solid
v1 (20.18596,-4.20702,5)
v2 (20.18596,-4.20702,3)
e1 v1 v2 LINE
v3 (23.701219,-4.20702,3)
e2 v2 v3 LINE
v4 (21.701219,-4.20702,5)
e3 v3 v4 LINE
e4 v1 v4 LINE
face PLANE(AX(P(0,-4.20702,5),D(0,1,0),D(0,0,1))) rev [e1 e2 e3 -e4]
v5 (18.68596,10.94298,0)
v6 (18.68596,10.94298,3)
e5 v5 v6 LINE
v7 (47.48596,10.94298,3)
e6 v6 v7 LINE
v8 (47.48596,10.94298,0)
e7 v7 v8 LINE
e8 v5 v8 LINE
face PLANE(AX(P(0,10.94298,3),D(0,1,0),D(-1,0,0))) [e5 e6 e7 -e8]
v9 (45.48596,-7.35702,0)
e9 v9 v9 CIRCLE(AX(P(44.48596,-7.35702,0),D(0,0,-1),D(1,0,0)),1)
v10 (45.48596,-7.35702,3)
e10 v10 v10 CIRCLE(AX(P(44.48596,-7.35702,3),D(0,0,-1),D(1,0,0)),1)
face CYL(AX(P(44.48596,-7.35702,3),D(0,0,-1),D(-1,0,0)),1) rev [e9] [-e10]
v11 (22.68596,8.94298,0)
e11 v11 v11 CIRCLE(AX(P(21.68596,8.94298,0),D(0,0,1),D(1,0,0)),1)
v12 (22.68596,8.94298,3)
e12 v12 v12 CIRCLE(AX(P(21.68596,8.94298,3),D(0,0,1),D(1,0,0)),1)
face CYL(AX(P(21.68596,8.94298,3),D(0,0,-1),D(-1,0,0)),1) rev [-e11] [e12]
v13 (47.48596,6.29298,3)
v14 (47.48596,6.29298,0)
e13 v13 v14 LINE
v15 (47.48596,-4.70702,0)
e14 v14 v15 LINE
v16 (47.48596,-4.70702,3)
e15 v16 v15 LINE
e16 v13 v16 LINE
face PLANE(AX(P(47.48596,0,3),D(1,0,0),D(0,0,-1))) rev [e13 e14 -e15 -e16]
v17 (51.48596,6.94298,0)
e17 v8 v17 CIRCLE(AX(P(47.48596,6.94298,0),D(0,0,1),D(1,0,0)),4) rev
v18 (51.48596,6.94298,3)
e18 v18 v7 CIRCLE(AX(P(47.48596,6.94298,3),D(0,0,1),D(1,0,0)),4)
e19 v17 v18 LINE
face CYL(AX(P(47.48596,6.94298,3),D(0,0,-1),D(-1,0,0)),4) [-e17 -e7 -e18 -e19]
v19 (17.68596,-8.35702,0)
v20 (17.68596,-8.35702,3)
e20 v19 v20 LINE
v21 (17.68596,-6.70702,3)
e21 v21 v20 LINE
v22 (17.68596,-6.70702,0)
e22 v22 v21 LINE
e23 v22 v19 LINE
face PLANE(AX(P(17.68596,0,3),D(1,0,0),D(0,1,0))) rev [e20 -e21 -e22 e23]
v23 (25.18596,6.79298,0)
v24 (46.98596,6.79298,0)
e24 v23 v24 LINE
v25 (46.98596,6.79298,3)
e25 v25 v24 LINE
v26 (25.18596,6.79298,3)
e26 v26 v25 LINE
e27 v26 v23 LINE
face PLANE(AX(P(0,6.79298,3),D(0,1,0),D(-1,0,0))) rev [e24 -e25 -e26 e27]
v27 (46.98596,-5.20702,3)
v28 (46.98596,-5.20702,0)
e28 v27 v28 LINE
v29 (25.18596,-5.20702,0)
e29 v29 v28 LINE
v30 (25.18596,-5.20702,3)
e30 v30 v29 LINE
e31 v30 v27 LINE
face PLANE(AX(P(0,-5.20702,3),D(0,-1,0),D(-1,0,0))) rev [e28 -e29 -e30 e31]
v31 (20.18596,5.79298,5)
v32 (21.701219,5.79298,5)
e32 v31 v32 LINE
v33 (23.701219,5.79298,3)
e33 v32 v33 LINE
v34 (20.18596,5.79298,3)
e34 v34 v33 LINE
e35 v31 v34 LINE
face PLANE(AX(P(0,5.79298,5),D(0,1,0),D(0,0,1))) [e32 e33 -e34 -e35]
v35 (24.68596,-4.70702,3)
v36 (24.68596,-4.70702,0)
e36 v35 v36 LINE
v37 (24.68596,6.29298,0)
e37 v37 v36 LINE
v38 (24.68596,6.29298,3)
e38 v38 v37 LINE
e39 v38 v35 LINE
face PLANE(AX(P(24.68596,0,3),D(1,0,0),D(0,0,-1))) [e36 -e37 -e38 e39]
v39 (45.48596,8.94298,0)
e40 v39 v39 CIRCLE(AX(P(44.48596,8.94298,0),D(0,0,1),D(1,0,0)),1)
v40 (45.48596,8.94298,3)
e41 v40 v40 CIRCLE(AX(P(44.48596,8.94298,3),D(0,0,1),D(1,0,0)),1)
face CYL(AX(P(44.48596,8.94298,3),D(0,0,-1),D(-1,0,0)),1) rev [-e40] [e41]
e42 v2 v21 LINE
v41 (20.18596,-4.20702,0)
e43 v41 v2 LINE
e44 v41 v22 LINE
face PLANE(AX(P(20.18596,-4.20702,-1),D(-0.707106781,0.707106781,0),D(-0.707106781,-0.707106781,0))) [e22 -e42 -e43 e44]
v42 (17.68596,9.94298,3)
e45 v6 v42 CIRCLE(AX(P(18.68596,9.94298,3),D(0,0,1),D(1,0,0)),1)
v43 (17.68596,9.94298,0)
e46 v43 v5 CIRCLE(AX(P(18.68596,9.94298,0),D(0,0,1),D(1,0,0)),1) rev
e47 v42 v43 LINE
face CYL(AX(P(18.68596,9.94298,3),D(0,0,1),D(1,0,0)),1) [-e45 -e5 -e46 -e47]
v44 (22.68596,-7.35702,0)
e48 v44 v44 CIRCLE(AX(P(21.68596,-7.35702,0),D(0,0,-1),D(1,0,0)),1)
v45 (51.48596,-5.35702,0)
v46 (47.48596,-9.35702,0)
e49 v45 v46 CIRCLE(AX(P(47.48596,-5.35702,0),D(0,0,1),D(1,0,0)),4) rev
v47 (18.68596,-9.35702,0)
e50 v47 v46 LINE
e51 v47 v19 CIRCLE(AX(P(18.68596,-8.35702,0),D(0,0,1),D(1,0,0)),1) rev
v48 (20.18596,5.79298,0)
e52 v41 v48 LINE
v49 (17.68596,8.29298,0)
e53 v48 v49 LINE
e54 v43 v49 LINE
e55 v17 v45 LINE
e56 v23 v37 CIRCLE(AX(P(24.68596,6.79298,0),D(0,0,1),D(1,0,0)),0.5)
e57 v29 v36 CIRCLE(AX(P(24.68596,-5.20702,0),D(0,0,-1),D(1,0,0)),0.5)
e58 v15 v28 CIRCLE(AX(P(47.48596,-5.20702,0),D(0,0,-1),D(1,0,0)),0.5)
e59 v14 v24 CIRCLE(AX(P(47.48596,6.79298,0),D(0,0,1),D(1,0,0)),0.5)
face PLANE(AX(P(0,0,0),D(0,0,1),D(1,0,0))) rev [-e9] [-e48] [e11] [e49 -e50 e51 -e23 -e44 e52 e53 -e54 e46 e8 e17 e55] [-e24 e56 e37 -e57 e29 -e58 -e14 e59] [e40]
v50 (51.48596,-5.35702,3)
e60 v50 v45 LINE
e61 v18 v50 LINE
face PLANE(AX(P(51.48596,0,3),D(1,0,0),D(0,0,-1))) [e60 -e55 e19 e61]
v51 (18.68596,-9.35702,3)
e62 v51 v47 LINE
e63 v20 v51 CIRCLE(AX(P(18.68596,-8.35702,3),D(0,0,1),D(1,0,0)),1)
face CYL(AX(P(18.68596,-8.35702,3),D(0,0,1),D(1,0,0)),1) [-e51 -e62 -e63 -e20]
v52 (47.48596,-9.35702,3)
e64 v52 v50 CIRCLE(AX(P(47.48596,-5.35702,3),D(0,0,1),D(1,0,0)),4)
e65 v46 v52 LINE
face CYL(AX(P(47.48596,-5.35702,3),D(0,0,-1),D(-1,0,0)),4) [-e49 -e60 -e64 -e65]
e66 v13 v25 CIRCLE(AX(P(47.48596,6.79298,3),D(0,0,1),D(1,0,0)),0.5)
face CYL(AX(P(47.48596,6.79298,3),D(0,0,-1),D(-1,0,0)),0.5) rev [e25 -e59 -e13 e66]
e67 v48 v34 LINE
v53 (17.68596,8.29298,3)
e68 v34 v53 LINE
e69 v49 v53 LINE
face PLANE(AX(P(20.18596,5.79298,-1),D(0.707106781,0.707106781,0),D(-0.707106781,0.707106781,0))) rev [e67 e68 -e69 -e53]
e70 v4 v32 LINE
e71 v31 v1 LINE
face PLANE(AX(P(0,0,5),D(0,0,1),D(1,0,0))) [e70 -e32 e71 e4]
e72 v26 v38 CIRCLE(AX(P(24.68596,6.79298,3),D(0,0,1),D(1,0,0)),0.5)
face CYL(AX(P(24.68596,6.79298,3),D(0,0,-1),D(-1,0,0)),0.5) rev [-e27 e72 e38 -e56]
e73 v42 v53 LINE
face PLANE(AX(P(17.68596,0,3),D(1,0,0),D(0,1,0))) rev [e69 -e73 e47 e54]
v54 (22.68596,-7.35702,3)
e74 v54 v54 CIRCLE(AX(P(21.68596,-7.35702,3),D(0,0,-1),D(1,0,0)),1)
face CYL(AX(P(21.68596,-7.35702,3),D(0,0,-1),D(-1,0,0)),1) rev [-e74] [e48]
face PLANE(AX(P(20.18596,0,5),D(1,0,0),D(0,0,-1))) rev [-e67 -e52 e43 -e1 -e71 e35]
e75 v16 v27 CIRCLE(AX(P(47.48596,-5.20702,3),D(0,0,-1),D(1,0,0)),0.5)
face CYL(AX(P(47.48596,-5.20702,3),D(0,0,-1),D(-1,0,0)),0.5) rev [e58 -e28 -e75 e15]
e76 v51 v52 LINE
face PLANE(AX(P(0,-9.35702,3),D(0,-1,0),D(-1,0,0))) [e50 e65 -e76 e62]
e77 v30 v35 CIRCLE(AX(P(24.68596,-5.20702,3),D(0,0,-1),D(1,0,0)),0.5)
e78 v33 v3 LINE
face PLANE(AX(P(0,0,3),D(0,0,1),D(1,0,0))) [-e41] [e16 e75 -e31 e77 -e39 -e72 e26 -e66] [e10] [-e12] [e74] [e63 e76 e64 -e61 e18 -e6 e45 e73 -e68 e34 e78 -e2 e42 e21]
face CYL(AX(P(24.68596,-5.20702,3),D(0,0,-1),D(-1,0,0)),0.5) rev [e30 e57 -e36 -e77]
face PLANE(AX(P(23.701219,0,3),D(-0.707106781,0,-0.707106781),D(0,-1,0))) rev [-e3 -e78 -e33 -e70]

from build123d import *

# Parameters (mm, degrees)
SKETCH2_R           = 1
BOSS_EXTRUDE1_DEPTH = 3
SKETCH3_W           = 3.515258844
SKETCH3_H           = 10
BOSS_EXTRUDE2_DEPTH = 2
CHAMFER1_SIZE       = 2
FILLET1_R           = 4
FILLET2_R           = 1
CUT_EXTRUDE1_DEPTH  = 4


with BuildPart() as part:
    # Sketch2 → Boss-Extrude1 (new body)
    with BuildSketch(Plane.XY):
        with BuildLine():
            Line((47.48595993, 0.792979965), (51.48595993, 0.792979965))
            Line((51.48595993, 0.792979965), (51.48595993, 10.942979965))
            Line((51.48595993, 10.942979965), (17.68595993, 10.942979965))
            Line((17.68595993, 10.942979965), (17.68595993, 0.792979965))
            Line((17.68595993, 0.792979965), (24.68595993, 0.792979965))
            Line((24.68595993, 0.792979965), (24.68595993, 6.292979965))
            ThreePointArc((24.68595993, 6.292979965), (24.33240654, 7.146533356), (25.18595993, 6.792979965))
            Line((25.18595993, 6.792979965), (46.98595993, 6.792979965))
            ThreePointArc((46.98595993, 6.792979965), (47.839513321, 7.146533356), (47.48595993, 6.292979965))
            Line((47.48595993, 6.292979965), (47.48595993, 0.792979965))
        make_face()
        with Locations((44.48595993, 8.942979965)):
            Circle(SKETCH2_R, mode=Mode.SUBTRACT)
        with Locations((21.68595993, 8.942979965)):
            Circle(SKETCH2_R, mode=Mode.SUBTRACT)
    extrude(amount=BOSS_EXTRUDE1_DEPTH)

    # Mirror1: part across plane


with BuildPart() as part_1:
    add(part.part)
    add(part.part.mirror(Plane(origin=(0, 0.792979965, 3), x_dir=(0, 0, 1), z_dir=(0, -1, 0))))

    # Sketch3 → Boss-Extrude2 (add)
    with BuildSketch(Plane.XY.offset(3)):
        with Locations((21.943589352, 0.792979965)):
            Rectangle(SKETCH3_W, SKETCH3_H)
    extrude(amount=BOSS_EXTRUDE2_DEPTH)

    # Chamfer1
    chamfer1_edges = [part_1.edges().sort_by_distance(p)[0] for p in [
        (23.701218774, 0.792979965, 5),
    ]]
    chamfer(chamfer1_edges, length=CHAMFER1_SIZE - 0.0001)  # a hair under: the kernel refuses the full size

    # Fillet1
    fillet1_edges = [part_1.edges().sort_by_distance(p)[0] for p in [
        (51.48595993, 10.942979965, 1.5),
        (51.48595993, -9.357020035, 1.5),
    ]]
    fillet(fillet1_edges, radius=FILLET1_R)

    # Fillet2
    fillet2_edges = [part_1.edges().sort_by_distance(p)[0] for p in [
        (17.68595993, 10.942979965, 1.5),
        (17.68595993, -9.357020035, 1.5),
    ]]
    fillet(fillet2_edges, radius=FILLET2_R)

    # Sketch4 → Cut-Extrude1 (cut)
    with BuildSketch(Plane.XY.offset(3)):
        Polygon((20.18595993, -4.207020035), (17.68595993, -6.707020035), (17.68595993, 8.292979965), (20.18595993, 5.792979965), align=None)
    extrude(amount=-CUT_EXTRUDE1_DEPTH, mode=Mode.SUBTRACT)


solid = part_1.part
